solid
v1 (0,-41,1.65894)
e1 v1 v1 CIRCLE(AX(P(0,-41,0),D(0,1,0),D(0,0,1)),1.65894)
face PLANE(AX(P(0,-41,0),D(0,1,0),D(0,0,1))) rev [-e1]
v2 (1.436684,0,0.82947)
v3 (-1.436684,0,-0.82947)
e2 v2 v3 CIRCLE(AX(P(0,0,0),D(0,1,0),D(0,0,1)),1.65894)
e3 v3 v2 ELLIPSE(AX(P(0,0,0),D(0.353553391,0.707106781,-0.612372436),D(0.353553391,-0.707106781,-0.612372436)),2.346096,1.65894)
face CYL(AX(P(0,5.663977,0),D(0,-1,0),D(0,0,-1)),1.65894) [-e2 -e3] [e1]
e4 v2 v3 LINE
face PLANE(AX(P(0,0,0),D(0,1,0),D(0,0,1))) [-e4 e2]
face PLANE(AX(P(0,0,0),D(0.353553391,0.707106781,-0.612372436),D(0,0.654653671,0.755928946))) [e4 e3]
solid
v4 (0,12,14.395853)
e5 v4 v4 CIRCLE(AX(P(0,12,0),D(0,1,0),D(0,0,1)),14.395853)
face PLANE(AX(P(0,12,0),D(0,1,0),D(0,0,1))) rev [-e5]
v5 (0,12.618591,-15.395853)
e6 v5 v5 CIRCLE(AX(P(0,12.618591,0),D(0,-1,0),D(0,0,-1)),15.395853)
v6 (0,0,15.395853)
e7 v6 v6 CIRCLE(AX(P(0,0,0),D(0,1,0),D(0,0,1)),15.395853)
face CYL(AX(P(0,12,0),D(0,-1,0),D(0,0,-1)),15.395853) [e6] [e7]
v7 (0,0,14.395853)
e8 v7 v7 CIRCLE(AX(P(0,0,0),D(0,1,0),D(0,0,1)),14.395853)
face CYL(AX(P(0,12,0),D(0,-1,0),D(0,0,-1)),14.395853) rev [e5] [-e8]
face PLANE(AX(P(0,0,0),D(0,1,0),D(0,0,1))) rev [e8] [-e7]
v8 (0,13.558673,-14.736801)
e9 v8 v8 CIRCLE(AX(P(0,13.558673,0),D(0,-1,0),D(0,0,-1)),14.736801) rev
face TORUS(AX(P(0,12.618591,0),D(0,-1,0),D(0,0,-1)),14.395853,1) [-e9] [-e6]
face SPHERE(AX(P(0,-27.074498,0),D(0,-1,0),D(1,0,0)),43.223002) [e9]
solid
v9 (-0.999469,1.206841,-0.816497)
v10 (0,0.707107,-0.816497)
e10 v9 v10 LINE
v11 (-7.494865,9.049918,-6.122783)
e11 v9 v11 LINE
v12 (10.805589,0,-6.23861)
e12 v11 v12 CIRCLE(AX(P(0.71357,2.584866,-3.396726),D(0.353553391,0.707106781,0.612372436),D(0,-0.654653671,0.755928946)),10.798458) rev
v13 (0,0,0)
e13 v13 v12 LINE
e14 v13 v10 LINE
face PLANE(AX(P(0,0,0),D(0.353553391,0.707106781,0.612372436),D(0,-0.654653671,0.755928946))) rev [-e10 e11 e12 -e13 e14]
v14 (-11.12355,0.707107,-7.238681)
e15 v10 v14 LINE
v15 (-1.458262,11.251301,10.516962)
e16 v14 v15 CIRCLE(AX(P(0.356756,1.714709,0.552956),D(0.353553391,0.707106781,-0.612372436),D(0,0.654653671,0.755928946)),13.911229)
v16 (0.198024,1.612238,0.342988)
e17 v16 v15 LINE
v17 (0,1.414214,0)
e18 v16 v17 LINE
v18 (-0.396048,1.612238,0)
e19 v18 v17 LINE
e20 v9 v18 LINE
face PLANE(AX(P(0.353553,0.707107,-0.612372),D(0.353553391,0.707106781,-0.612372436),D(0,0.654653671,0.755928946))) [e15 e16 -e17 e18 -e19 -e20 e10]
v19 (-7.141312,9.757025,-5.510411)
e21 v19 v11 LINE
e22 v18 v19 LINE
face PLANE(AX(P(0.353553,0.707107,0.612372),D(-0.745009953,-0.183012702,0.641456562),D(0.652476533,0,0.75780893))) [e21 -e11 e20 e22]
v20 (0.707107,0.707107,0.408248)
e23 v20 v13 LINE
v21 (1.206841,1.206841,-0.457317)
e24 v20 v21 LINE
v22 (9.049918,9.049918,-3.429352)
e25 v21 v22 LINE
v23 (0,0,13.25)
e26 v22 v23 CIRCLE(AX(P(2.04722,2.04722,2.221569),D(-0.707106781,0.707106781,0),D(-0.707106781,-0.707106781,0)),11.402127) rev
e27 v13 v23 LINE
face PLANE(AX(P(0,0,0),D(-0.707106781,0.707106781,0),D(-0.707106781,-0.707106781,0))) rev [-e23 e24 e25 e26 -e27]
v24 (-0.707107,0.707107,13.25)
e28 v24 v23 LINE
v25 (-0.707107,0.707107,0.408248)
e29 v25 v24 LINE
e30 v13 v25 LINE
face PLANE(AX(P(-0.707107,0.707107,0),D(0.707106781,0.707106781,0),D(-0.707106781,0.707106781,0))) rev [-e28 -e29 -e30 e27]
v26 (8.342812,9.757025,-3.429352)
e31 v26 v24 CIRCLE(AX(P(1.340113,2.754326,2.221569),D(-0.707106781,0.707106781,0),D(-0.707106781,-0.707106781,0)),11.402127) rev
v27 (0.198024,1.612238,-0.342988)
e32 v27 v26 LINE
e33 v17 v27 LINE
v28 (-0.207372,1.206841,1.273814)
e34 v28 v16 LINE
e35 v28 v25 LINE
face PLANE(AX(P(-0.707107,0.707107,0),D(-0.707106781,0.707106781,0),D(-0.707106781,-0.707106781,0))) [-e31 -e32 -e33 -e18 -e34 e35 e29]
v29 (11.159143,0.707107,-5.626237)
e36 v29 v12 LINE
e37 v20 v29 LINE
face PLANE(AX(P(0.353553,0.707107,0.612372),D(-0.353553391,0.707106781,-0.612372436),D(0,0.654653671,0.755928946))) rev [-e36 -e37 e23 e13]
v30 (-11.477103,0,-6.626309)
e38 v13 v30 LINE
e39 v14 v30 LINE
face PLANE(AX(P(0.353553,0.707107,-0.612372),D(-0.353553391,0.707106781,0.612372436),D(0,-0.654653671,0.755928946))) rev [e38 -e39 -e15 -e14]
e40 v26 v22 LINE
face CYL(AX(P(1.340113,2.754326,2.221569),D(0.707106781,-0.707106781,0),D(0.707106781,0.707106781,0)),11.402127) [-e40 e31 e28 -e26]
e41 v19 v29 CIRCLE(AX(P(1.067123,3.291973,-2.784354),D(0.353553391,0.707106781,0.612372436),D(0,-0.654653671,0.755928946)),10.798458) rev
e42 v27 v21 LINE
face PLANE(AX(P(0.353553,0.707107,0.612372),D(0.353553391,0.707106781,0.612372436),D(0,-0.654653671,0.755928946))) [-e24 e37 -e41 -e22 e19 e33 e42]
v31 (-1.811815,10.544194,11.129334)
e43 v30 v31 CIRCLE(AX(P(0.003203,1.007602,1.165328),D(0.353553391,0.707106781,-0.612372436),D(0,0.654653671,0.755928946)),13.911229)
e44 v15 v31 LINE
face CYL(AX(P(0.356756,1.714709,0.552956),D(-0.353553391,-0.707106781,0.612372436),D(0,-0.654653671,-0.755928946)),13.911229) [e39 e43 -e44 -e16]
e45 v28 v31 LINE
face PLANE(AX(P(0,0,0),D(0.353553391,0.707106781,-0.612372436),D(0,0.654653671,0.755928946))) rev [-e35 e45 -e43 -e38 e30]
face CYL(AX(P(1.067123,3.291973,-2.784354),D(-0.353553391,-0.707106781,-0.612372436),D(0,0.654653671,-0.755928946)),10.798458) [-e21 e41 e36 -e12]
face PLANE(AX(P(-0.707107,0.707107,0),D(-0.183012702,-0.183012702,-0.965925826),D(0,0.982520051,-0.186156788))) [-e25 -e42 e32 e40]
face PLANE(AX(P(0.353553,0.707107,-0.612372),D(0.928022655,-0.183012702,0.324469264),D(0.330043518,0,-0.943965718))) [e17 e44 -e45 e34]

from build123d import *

# Parameters (mm, degrees)
BOSS_EXTRUDE1_DEPTH             = 1
BOSS_EXTRUDE2_DEPTH             = 1
BOSS_EXTRUDE3_DEPTH             = 1
SKETCH5_R                       = 1.658940309
BOSS_EXTRUDE4_DEPTH             = 41
BOSS_EXTRUDE4_DIRECTION_2_REACH = 24.097
SKETCH6_R                       = 15.395853367
SKETCH6_R_2                     = 14.395853367
BOSS_EXTRUDE5_DEPTH             = 12
SKETCH7_R                       = 15.395853367
BOSS_EXTRUDE6_DEPTH             = 11
FILLET1_R                       = 1


with BuildPart() as part:
    # Sketch2 → Boss-Extrude1 (new body)
    with BuildSketch(Plane(origin=(0, 0, 0), x_dir=(0.7071067811865464, 0.7071067811865488, 0), z_dir=(-0.7071067811865488, 0.7071067811865464, 0))):
        with BuildLine():
            Line((12.798517198, 3.429352348), (0, 0))
            Line((0, 0), (0, -13.25))
            ThreePointArc((0, -13.25), (11.941121051, -9.162744449), (12.798517198, 3.429352348))
        make_face()
    extrude(amount=BOSS_EXTRUDE1_DEPTH)

    # Sketch3 → Boss-Extrude2 (add)
    with BuildSketch(Plane(origin=(0, 0, 0), x_dir=(0.9267766952966354, -0.3535533905932773, 0.1268264840443233), z_dir=(0.3535533905932773, 0.7071067811865464, -0.6123724356957939))):
        with BuildLine():
            Line((-3.995589253, -14.911742098), (0, 0))
            Line((0, 0), (-11.477103172, 6.626308606))
            ThreePointArc((-11.477103172, 6.626308606), (-13.346478341, -6.091466992), (-3.995589253, -14.911742098))
        make_face()
    extrude(amount=BOSS_EXTRUDE2_DEPTH)

    # Sketch4 → Boss-Extrude3 (add)
    with BuildSketch(Plane(origin=(0, 0, 0), x_dir=(0.926776695296639, -0.35355339059326873, -0.1268264840443212), z_dir=(0.3535533905932687, 0.7071067811865464, 0.6123724356957988))):
        with BuildLine():
            Line((-9.369164851, 9.369164851), (0, 0))
            Line((0, 0), (10.80558923, 6.238609851))
            ThreePointArc((10.80558923, 6.238609851), (1.834027886, 14.994723252), (-9.369164851, 9.369164851))
        make_face()
    extrude(amount=BOSS_EXTRUDE3_DEPTH)


with BuildPart() as body_2:
    # Sketch5 → Boss-Extrude4 (new body)
    with BuildSketch(Plane(origin=(0, 0, 0), x_dir=(1, 0, 0), z_dir=(0, 1, 0))):
        Circle(SKETCH5_R)
    extrude(amount=-BOSS_EXTRUDE4_DEPTH)


    # Boss-Extrude4 direction 2: up to this face of the body (flat: up to its plane)
    boss_extrude4_direction_2_end = Plane(part.part.faces().sort_by_distance((-6.525054455, 5.025095219, 2.035238209))[0])
    # Sketch5 → Boss-Extrude4 direction 2 (add, up to the picked face)
    with BuildSketch(Plane(origin=(0, 0, 0), x_dir=(1, 0, 0), z_dir=(0, 1, 0)), mode=Mode.PRIVATE) as boss_extrude4_direction_2_sk1:
        Circle(SKETCH5_R)
    boss_extrude4_direction_2_tool1 = split(extrude(boss_extrude4_direction_2_sk1.sketch, amount=BOSS_EXTRUDE4_DIRECTION_2_REACH, mode=Mode.PRIVATE), bisect_by=boss_extrude4_direction_2_end, keep=Keep.BOTH, mode=Mode.PRIVATE)
    add(boss_extrude4_direction_2_tool1.solids().sort_by(Axis((0, 0, 0), (0, 1, 0)))[0])


with BuildPart() as body_3:
    # Sketch6 → Boss-Extrude5 (new body)
    with BuildSketch(Plane(origin=(0, 0, 0), x_dir=(1, 0, 0), z_dir=(0, 1, 0))):
        Circle(SKETCH6_R)
        Circle(SKETCH6_R_2, mode=Mode.SUBTRACT)
    extrude(amount=BOSS_EXTRUDE5_DEPTH)

    # Sketch7 → Boss-Extrude6 (add)
    with BuildSketch(Plane(origin=(0, 12, 0), x_dir=(1, 0, 0), z_dir=(0, 1, 0))):
        Circle(SKETCH7_R)
    extrude(amount=BOSS_EXTRUDE6_DEPTH)

    # Sketch8 → Cut-Revolve2 (revolve, cut)
    with BuildSketch(Plane.XY):
        with BuildLine():
            Line((0, 16.148504019), (0, 23.90296441))
            Line((0, 23.90296441), (16.293851605, 23.90296441))
            Line((16.293851605, 23.90296441), (16.293851605, 12.959716191))
            ThreePointArc((16.293851605, 12.959716191), (8.30147529, 15.343816585), (0, 16.148504019))
        make_face()
    revolve(axis=Axis((0, 16.148504019, 0), (0, 1, 0)), mode=Mode.SUBTRACT)

    # Fillet1
    fillet1_edges = [body_3.edges().sort_by_distance(p)[0] for p in [
        (-15.395853365, 13.313564653, 0),
    ]]
    fillet(fillet1_edges, radius=FILLET1_R)


solid = Compound([part.part, body_2.part, body_3.part])
